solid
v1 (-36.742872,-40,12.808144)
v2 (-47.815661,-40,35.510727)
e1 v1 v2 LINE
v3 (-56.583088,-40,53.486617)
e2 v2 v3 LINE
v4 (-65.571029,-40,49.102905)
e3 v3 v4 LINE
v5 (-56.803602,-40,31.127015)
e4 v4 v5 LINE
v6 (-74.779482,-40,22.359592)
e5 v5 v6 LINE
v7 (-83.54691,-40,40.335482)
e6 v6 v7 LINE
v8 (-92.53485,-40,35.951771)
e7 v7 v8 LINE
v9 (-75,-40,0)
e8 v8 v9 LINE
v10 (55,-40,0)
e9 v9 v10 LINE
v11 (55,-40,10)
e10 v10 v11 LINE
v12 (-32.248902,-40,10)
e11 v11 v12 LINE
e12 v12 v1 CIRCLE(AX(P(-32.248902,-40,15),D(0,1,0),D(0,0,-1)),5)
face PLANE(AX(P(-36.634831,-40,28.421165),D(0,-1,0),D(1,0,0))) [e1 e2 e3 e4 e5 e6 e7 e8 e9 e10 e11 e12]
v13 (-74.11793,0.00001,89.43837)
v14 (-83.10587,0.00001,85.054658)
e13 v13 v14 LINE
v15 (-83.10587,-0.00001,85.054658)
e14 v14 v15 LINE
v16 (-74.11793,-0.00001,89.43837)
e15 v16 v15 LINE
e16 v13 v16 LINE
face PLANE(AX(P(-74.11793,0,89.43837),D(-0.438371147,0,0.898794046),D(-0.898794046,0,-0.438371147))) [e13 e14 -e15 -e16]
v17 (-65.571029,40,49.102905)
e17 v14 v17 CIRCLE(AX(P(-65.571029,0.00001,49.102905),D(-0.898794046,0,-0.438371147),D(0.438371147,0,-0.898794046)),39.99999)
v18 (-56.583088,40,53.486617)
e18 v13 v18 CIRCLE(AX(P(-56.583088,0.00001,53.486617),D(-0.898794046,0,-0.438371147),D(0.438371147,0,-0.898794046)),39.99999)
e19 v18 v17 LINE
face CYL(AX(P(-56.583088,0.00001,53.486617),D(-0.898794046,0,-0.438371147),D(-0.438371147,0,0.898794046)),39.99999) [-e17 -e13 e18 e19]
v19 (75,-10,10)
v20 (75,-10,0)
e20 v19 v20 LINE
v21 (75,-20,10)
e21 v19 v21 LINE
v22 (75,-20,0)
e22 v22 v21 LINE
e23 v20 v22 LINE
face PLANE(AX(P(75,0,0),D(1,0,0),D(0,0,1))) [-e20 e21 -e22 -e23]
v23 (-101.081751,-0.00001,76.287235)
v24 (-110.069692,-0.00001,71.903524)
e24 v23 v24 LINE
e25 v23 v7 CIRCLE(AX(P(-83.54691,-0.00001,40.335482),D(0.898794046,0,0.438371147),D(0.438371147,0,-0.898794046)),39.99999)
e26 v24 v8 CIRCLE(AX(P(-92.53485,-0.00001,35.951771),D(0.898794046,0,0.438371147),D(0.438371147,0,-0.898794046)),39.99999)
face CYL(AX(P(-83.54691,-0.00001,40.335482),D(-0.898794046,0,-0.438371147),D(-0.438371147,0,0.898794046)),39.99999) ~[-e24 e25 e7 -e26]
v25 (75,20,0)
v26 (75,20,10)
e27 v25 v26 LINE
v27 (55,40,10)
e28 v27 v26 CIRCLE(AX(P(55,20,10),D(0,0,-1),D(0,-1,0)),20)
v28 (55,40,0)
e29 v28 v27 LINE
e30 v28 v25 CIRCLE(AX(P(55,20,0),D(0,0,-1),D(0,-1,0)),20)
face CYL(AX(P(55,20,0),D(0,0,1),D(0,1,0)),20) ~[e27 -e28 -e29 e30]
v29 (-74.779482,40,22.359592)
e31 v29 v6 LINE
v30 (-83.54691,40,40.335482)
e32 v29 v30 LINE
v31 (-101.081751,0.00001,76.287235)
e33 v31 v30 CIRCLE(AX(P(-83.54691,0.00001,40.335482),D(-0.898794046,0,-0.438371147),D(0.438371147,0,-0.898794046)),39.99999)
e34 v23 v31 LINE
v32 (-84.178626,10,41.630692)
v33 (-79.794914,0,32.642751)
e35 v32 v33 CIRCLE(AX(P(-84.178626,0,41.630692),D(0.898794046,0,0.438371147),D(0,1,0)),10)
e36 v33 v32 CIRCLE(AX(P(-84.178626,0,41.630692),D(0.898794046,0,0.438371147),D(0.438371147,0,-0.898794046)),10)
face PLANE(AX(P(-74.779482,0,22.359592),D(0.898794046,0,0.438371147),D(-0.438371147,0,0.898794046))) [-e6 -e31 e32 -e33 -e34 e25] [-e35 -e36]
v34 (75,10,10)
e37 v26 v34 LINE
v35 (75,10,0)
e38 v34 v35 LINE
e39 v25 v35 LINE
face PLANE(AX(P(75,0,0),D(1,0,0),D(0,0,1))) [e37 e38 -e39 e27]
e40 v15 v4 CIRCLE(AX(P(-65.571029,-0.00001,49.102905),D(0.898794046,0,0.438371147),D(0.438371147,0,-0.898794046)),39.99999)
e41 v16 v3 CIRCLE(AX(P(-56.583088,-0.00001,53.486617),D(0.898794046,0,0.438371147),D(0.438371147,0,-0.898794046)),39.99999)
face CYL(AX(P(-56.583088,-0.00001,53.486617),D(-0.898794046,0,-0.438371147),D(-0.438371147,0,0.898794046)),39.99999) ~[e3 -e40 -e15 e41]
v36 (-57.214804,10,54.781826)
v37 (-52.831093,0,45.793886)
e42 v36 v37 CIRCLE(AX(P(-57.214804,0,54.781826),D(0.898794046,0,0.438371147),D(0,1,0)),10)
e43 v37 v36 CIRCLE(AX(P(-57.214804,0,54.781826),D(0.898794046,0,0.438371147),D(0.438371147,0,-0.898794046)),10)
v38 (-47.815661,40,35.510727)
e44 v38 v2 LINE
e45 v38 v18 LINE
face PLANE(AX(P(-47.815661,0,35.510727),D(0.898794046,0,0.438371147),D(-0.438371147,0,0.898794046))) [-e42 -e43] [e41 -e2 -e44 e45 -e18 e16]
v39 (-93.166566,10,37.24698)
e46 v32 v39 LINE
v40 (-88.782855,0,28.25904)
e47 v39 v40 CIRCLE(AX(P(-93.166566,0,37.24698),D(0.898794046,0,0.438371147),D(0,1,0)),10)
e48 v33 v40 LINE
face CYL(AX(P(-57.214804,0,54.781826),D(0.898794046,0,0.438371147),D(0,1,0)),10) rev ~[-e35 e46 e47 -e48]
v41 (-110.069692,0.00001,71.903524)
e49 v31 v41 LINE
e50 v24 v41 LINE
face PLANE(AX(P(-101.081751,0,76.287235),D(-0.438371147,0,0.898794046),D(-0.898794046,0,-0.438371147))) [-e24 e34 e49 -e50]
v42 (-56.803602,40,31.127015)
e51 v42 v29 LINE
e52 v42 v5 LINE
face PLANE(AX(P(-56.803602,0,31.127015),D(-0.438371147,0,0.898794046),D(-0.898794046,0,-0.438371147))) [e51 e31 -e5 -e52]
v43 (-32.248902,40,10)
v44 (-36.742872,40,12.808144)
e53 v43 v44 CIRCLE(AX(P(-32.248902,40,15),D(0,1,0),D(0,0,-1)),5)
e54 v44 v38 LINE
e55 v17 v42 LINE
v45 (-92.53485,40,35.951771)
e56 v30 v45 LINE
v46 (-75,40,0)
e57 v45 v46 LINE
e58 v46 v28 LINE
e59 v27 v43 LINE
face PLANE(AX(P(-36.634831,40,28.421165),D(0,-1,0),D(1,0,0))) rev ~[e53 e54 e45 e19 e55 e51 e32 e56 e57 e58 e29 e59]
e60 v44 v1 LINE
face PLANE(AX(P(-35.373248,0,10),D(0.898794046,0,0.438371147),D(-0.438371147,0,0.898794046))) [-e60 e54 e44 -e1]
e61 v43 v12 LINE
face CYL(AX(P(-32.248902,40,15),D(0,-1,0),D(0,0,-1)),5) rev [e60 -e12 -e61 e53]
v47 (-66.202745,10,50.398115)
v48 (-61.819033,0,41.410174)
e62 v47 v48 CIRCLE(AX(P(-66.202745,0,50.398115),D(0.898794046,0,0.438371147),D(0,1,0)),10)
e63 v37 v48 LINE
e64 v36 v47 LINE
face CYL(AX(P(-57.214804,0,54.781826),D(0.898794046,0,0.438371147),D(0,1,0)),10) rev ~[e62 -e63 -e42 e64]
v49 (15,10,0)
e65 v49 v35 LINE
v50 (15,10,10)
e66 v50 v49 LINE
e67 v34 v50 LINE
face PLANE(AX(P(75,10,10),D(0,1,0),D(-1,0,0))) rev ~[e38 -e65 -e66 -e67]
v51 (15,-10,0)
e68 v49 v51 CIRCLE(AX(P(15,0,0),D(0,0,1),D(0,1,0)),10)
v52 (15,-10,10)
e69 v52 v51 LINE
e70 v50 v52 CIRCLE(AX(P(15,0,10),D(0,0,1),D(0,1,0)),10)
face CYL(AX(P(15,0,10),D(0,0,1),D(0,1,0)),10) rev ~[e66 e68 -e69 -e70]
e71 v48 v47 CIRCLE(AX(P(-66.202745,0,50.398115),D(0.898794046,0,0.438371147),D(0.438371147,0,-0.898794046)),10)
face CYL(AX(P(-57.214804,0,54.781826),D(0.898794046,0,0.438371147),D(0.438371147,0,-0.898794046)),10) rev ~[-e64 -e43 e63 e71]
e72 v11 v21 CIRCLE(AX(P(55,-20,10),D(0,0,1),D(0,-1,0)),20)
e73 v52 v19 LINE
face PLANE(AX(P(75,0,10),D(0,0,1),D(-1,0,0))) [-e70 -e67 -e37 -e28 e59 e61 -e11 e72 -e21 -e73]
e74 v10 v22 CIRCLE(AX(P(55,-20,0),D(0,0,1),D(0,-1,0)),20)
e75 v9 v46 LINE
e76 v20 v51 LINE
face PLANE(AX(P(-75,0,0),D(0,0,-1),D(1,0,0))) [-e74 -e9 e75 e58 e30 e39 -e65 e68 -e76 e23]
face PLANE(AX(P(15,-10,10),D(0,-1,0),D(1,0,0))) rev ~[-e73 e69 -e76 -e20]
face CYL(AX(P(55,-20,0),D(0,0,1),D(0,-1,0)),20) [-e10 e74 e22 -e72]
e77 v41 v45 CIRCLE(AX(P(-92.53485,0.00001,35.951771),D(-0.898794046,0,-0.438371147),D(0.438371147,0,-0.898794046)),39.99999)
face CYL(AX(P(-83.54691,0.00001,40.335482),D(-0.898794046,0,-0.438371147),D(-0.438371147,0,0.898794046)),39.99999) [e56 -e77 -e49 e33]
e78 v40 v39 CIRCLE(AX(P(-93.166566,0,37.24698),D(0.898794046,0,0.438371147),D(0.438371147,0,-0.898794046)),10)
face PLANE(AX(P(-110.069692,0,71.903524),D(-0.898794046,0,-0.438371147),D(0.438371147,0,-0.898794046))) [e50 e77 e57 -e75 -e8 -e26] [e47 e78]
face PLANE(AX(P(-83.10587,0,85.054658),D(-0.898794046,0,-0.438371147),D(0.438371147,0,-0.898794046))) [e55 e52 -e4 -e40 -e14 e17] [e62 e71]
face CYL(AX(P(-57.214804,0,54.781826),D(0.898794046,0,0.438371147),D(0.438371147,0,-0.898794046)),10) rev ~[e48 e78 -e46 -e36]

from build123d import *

# Parameters (mm, degrees)
F1_DEPTH      = 40
F1_DEPTH_BACK = 40
F2_R          = 39.99999
F4_DEPTH      = 25
F5_R          = 20
F6_R          = 5
F8_DEPTH      = 63


# Not quite as in the source:
# - a fillet or chamfer is up to 0.001 mm smaller than in the source, because OpenCascade refuses the exact size


with BuildPart() as f1:
    # F0 (on Front) → F1 (new body, two sides)
    with BuildSketch(Plane.XZ) as f1_sk:
        Polygon((-75, 0), (0, 0), (75, 0), (75, 10), (-35.3732482667, 10), (-47.8156610838, 35.5107267975), (-74.1179298912, 89.4383695755), (-83.1058703542, 85.0546581076), (-56.8036015468, 31.1270153297), (-74.7794824728, 22.3595923939), (-101.0817512801, 76.2872351718), (-110.0696917431, 71.9035237039), align=None)
    extrude(amount=F1_DEPTH)
    extrude(f1_sk.sketch, amount=-F1_DEPTH_BACK)

    # F2 (radius 40 in the source; OpenCascade refuses exactly that, so slightly less here)
    f2_edges = [f1.edges().sort_by_distance(p)[0] for p in [
        (-78.6119, -40, 87.246514),
        (-78.6119, 40, 87.246514),
        (-105.575722, -40, 74.095379),
        (-105.575722, 40, 74.095379),
    ]]
    fillet(f2_edges, radius=F2_R)

    # F3 (on face) → F4 (cut)
    with BuildSketch(Plane.XY.offset(10)):
        with BuildLine():
            Line((75, 10), (15, 10))
            ThreePointArc((15, 10), (5, 0), (15, -10))
            Line((15, -10), (75, -10))
            Line((75, -10), (75, 10))
        make_face()
    extrude(amount=-F4_DEPTH, mode=Mode.SUBTRACT)

    # F5
    f5_edges = [f1.edges().sort_by_distance(p)[0] for p in [
        (75, 40, 5),
        (75, -40, 5),
    ]]
    fillet(f5_edges, radius=F5_R)

    # F6
    f6_edges = [f1.edges().sort_by_distance(p)[0] for p in [
        (-35.373248, 0, 10),
    ]]
    fillet(f6_edges, radius=F6_R)

    # F7 (on face) → F8 (cut)
    with BuildSketch(Plane(origin=(-24.6355434727, 0, -12.0155573887), x_dir=(0, 1, 0), z_dir=(0.8987940463, 0, 0.4383711468))):
        with BuildLine():
            ThreePointArc((0, 64.3188986308), (7.0710678119, 67.247830819), (10, 74.3188986308))
            ThreePointArc((10, 74.3188986308), (-7.0710678119, 81.3899664427), (0, 64.3188986308))
        make_face()
    extrude(amount=-F8_DEPTH, mode=Mode.SUBTRACT)


solid = f1.part
